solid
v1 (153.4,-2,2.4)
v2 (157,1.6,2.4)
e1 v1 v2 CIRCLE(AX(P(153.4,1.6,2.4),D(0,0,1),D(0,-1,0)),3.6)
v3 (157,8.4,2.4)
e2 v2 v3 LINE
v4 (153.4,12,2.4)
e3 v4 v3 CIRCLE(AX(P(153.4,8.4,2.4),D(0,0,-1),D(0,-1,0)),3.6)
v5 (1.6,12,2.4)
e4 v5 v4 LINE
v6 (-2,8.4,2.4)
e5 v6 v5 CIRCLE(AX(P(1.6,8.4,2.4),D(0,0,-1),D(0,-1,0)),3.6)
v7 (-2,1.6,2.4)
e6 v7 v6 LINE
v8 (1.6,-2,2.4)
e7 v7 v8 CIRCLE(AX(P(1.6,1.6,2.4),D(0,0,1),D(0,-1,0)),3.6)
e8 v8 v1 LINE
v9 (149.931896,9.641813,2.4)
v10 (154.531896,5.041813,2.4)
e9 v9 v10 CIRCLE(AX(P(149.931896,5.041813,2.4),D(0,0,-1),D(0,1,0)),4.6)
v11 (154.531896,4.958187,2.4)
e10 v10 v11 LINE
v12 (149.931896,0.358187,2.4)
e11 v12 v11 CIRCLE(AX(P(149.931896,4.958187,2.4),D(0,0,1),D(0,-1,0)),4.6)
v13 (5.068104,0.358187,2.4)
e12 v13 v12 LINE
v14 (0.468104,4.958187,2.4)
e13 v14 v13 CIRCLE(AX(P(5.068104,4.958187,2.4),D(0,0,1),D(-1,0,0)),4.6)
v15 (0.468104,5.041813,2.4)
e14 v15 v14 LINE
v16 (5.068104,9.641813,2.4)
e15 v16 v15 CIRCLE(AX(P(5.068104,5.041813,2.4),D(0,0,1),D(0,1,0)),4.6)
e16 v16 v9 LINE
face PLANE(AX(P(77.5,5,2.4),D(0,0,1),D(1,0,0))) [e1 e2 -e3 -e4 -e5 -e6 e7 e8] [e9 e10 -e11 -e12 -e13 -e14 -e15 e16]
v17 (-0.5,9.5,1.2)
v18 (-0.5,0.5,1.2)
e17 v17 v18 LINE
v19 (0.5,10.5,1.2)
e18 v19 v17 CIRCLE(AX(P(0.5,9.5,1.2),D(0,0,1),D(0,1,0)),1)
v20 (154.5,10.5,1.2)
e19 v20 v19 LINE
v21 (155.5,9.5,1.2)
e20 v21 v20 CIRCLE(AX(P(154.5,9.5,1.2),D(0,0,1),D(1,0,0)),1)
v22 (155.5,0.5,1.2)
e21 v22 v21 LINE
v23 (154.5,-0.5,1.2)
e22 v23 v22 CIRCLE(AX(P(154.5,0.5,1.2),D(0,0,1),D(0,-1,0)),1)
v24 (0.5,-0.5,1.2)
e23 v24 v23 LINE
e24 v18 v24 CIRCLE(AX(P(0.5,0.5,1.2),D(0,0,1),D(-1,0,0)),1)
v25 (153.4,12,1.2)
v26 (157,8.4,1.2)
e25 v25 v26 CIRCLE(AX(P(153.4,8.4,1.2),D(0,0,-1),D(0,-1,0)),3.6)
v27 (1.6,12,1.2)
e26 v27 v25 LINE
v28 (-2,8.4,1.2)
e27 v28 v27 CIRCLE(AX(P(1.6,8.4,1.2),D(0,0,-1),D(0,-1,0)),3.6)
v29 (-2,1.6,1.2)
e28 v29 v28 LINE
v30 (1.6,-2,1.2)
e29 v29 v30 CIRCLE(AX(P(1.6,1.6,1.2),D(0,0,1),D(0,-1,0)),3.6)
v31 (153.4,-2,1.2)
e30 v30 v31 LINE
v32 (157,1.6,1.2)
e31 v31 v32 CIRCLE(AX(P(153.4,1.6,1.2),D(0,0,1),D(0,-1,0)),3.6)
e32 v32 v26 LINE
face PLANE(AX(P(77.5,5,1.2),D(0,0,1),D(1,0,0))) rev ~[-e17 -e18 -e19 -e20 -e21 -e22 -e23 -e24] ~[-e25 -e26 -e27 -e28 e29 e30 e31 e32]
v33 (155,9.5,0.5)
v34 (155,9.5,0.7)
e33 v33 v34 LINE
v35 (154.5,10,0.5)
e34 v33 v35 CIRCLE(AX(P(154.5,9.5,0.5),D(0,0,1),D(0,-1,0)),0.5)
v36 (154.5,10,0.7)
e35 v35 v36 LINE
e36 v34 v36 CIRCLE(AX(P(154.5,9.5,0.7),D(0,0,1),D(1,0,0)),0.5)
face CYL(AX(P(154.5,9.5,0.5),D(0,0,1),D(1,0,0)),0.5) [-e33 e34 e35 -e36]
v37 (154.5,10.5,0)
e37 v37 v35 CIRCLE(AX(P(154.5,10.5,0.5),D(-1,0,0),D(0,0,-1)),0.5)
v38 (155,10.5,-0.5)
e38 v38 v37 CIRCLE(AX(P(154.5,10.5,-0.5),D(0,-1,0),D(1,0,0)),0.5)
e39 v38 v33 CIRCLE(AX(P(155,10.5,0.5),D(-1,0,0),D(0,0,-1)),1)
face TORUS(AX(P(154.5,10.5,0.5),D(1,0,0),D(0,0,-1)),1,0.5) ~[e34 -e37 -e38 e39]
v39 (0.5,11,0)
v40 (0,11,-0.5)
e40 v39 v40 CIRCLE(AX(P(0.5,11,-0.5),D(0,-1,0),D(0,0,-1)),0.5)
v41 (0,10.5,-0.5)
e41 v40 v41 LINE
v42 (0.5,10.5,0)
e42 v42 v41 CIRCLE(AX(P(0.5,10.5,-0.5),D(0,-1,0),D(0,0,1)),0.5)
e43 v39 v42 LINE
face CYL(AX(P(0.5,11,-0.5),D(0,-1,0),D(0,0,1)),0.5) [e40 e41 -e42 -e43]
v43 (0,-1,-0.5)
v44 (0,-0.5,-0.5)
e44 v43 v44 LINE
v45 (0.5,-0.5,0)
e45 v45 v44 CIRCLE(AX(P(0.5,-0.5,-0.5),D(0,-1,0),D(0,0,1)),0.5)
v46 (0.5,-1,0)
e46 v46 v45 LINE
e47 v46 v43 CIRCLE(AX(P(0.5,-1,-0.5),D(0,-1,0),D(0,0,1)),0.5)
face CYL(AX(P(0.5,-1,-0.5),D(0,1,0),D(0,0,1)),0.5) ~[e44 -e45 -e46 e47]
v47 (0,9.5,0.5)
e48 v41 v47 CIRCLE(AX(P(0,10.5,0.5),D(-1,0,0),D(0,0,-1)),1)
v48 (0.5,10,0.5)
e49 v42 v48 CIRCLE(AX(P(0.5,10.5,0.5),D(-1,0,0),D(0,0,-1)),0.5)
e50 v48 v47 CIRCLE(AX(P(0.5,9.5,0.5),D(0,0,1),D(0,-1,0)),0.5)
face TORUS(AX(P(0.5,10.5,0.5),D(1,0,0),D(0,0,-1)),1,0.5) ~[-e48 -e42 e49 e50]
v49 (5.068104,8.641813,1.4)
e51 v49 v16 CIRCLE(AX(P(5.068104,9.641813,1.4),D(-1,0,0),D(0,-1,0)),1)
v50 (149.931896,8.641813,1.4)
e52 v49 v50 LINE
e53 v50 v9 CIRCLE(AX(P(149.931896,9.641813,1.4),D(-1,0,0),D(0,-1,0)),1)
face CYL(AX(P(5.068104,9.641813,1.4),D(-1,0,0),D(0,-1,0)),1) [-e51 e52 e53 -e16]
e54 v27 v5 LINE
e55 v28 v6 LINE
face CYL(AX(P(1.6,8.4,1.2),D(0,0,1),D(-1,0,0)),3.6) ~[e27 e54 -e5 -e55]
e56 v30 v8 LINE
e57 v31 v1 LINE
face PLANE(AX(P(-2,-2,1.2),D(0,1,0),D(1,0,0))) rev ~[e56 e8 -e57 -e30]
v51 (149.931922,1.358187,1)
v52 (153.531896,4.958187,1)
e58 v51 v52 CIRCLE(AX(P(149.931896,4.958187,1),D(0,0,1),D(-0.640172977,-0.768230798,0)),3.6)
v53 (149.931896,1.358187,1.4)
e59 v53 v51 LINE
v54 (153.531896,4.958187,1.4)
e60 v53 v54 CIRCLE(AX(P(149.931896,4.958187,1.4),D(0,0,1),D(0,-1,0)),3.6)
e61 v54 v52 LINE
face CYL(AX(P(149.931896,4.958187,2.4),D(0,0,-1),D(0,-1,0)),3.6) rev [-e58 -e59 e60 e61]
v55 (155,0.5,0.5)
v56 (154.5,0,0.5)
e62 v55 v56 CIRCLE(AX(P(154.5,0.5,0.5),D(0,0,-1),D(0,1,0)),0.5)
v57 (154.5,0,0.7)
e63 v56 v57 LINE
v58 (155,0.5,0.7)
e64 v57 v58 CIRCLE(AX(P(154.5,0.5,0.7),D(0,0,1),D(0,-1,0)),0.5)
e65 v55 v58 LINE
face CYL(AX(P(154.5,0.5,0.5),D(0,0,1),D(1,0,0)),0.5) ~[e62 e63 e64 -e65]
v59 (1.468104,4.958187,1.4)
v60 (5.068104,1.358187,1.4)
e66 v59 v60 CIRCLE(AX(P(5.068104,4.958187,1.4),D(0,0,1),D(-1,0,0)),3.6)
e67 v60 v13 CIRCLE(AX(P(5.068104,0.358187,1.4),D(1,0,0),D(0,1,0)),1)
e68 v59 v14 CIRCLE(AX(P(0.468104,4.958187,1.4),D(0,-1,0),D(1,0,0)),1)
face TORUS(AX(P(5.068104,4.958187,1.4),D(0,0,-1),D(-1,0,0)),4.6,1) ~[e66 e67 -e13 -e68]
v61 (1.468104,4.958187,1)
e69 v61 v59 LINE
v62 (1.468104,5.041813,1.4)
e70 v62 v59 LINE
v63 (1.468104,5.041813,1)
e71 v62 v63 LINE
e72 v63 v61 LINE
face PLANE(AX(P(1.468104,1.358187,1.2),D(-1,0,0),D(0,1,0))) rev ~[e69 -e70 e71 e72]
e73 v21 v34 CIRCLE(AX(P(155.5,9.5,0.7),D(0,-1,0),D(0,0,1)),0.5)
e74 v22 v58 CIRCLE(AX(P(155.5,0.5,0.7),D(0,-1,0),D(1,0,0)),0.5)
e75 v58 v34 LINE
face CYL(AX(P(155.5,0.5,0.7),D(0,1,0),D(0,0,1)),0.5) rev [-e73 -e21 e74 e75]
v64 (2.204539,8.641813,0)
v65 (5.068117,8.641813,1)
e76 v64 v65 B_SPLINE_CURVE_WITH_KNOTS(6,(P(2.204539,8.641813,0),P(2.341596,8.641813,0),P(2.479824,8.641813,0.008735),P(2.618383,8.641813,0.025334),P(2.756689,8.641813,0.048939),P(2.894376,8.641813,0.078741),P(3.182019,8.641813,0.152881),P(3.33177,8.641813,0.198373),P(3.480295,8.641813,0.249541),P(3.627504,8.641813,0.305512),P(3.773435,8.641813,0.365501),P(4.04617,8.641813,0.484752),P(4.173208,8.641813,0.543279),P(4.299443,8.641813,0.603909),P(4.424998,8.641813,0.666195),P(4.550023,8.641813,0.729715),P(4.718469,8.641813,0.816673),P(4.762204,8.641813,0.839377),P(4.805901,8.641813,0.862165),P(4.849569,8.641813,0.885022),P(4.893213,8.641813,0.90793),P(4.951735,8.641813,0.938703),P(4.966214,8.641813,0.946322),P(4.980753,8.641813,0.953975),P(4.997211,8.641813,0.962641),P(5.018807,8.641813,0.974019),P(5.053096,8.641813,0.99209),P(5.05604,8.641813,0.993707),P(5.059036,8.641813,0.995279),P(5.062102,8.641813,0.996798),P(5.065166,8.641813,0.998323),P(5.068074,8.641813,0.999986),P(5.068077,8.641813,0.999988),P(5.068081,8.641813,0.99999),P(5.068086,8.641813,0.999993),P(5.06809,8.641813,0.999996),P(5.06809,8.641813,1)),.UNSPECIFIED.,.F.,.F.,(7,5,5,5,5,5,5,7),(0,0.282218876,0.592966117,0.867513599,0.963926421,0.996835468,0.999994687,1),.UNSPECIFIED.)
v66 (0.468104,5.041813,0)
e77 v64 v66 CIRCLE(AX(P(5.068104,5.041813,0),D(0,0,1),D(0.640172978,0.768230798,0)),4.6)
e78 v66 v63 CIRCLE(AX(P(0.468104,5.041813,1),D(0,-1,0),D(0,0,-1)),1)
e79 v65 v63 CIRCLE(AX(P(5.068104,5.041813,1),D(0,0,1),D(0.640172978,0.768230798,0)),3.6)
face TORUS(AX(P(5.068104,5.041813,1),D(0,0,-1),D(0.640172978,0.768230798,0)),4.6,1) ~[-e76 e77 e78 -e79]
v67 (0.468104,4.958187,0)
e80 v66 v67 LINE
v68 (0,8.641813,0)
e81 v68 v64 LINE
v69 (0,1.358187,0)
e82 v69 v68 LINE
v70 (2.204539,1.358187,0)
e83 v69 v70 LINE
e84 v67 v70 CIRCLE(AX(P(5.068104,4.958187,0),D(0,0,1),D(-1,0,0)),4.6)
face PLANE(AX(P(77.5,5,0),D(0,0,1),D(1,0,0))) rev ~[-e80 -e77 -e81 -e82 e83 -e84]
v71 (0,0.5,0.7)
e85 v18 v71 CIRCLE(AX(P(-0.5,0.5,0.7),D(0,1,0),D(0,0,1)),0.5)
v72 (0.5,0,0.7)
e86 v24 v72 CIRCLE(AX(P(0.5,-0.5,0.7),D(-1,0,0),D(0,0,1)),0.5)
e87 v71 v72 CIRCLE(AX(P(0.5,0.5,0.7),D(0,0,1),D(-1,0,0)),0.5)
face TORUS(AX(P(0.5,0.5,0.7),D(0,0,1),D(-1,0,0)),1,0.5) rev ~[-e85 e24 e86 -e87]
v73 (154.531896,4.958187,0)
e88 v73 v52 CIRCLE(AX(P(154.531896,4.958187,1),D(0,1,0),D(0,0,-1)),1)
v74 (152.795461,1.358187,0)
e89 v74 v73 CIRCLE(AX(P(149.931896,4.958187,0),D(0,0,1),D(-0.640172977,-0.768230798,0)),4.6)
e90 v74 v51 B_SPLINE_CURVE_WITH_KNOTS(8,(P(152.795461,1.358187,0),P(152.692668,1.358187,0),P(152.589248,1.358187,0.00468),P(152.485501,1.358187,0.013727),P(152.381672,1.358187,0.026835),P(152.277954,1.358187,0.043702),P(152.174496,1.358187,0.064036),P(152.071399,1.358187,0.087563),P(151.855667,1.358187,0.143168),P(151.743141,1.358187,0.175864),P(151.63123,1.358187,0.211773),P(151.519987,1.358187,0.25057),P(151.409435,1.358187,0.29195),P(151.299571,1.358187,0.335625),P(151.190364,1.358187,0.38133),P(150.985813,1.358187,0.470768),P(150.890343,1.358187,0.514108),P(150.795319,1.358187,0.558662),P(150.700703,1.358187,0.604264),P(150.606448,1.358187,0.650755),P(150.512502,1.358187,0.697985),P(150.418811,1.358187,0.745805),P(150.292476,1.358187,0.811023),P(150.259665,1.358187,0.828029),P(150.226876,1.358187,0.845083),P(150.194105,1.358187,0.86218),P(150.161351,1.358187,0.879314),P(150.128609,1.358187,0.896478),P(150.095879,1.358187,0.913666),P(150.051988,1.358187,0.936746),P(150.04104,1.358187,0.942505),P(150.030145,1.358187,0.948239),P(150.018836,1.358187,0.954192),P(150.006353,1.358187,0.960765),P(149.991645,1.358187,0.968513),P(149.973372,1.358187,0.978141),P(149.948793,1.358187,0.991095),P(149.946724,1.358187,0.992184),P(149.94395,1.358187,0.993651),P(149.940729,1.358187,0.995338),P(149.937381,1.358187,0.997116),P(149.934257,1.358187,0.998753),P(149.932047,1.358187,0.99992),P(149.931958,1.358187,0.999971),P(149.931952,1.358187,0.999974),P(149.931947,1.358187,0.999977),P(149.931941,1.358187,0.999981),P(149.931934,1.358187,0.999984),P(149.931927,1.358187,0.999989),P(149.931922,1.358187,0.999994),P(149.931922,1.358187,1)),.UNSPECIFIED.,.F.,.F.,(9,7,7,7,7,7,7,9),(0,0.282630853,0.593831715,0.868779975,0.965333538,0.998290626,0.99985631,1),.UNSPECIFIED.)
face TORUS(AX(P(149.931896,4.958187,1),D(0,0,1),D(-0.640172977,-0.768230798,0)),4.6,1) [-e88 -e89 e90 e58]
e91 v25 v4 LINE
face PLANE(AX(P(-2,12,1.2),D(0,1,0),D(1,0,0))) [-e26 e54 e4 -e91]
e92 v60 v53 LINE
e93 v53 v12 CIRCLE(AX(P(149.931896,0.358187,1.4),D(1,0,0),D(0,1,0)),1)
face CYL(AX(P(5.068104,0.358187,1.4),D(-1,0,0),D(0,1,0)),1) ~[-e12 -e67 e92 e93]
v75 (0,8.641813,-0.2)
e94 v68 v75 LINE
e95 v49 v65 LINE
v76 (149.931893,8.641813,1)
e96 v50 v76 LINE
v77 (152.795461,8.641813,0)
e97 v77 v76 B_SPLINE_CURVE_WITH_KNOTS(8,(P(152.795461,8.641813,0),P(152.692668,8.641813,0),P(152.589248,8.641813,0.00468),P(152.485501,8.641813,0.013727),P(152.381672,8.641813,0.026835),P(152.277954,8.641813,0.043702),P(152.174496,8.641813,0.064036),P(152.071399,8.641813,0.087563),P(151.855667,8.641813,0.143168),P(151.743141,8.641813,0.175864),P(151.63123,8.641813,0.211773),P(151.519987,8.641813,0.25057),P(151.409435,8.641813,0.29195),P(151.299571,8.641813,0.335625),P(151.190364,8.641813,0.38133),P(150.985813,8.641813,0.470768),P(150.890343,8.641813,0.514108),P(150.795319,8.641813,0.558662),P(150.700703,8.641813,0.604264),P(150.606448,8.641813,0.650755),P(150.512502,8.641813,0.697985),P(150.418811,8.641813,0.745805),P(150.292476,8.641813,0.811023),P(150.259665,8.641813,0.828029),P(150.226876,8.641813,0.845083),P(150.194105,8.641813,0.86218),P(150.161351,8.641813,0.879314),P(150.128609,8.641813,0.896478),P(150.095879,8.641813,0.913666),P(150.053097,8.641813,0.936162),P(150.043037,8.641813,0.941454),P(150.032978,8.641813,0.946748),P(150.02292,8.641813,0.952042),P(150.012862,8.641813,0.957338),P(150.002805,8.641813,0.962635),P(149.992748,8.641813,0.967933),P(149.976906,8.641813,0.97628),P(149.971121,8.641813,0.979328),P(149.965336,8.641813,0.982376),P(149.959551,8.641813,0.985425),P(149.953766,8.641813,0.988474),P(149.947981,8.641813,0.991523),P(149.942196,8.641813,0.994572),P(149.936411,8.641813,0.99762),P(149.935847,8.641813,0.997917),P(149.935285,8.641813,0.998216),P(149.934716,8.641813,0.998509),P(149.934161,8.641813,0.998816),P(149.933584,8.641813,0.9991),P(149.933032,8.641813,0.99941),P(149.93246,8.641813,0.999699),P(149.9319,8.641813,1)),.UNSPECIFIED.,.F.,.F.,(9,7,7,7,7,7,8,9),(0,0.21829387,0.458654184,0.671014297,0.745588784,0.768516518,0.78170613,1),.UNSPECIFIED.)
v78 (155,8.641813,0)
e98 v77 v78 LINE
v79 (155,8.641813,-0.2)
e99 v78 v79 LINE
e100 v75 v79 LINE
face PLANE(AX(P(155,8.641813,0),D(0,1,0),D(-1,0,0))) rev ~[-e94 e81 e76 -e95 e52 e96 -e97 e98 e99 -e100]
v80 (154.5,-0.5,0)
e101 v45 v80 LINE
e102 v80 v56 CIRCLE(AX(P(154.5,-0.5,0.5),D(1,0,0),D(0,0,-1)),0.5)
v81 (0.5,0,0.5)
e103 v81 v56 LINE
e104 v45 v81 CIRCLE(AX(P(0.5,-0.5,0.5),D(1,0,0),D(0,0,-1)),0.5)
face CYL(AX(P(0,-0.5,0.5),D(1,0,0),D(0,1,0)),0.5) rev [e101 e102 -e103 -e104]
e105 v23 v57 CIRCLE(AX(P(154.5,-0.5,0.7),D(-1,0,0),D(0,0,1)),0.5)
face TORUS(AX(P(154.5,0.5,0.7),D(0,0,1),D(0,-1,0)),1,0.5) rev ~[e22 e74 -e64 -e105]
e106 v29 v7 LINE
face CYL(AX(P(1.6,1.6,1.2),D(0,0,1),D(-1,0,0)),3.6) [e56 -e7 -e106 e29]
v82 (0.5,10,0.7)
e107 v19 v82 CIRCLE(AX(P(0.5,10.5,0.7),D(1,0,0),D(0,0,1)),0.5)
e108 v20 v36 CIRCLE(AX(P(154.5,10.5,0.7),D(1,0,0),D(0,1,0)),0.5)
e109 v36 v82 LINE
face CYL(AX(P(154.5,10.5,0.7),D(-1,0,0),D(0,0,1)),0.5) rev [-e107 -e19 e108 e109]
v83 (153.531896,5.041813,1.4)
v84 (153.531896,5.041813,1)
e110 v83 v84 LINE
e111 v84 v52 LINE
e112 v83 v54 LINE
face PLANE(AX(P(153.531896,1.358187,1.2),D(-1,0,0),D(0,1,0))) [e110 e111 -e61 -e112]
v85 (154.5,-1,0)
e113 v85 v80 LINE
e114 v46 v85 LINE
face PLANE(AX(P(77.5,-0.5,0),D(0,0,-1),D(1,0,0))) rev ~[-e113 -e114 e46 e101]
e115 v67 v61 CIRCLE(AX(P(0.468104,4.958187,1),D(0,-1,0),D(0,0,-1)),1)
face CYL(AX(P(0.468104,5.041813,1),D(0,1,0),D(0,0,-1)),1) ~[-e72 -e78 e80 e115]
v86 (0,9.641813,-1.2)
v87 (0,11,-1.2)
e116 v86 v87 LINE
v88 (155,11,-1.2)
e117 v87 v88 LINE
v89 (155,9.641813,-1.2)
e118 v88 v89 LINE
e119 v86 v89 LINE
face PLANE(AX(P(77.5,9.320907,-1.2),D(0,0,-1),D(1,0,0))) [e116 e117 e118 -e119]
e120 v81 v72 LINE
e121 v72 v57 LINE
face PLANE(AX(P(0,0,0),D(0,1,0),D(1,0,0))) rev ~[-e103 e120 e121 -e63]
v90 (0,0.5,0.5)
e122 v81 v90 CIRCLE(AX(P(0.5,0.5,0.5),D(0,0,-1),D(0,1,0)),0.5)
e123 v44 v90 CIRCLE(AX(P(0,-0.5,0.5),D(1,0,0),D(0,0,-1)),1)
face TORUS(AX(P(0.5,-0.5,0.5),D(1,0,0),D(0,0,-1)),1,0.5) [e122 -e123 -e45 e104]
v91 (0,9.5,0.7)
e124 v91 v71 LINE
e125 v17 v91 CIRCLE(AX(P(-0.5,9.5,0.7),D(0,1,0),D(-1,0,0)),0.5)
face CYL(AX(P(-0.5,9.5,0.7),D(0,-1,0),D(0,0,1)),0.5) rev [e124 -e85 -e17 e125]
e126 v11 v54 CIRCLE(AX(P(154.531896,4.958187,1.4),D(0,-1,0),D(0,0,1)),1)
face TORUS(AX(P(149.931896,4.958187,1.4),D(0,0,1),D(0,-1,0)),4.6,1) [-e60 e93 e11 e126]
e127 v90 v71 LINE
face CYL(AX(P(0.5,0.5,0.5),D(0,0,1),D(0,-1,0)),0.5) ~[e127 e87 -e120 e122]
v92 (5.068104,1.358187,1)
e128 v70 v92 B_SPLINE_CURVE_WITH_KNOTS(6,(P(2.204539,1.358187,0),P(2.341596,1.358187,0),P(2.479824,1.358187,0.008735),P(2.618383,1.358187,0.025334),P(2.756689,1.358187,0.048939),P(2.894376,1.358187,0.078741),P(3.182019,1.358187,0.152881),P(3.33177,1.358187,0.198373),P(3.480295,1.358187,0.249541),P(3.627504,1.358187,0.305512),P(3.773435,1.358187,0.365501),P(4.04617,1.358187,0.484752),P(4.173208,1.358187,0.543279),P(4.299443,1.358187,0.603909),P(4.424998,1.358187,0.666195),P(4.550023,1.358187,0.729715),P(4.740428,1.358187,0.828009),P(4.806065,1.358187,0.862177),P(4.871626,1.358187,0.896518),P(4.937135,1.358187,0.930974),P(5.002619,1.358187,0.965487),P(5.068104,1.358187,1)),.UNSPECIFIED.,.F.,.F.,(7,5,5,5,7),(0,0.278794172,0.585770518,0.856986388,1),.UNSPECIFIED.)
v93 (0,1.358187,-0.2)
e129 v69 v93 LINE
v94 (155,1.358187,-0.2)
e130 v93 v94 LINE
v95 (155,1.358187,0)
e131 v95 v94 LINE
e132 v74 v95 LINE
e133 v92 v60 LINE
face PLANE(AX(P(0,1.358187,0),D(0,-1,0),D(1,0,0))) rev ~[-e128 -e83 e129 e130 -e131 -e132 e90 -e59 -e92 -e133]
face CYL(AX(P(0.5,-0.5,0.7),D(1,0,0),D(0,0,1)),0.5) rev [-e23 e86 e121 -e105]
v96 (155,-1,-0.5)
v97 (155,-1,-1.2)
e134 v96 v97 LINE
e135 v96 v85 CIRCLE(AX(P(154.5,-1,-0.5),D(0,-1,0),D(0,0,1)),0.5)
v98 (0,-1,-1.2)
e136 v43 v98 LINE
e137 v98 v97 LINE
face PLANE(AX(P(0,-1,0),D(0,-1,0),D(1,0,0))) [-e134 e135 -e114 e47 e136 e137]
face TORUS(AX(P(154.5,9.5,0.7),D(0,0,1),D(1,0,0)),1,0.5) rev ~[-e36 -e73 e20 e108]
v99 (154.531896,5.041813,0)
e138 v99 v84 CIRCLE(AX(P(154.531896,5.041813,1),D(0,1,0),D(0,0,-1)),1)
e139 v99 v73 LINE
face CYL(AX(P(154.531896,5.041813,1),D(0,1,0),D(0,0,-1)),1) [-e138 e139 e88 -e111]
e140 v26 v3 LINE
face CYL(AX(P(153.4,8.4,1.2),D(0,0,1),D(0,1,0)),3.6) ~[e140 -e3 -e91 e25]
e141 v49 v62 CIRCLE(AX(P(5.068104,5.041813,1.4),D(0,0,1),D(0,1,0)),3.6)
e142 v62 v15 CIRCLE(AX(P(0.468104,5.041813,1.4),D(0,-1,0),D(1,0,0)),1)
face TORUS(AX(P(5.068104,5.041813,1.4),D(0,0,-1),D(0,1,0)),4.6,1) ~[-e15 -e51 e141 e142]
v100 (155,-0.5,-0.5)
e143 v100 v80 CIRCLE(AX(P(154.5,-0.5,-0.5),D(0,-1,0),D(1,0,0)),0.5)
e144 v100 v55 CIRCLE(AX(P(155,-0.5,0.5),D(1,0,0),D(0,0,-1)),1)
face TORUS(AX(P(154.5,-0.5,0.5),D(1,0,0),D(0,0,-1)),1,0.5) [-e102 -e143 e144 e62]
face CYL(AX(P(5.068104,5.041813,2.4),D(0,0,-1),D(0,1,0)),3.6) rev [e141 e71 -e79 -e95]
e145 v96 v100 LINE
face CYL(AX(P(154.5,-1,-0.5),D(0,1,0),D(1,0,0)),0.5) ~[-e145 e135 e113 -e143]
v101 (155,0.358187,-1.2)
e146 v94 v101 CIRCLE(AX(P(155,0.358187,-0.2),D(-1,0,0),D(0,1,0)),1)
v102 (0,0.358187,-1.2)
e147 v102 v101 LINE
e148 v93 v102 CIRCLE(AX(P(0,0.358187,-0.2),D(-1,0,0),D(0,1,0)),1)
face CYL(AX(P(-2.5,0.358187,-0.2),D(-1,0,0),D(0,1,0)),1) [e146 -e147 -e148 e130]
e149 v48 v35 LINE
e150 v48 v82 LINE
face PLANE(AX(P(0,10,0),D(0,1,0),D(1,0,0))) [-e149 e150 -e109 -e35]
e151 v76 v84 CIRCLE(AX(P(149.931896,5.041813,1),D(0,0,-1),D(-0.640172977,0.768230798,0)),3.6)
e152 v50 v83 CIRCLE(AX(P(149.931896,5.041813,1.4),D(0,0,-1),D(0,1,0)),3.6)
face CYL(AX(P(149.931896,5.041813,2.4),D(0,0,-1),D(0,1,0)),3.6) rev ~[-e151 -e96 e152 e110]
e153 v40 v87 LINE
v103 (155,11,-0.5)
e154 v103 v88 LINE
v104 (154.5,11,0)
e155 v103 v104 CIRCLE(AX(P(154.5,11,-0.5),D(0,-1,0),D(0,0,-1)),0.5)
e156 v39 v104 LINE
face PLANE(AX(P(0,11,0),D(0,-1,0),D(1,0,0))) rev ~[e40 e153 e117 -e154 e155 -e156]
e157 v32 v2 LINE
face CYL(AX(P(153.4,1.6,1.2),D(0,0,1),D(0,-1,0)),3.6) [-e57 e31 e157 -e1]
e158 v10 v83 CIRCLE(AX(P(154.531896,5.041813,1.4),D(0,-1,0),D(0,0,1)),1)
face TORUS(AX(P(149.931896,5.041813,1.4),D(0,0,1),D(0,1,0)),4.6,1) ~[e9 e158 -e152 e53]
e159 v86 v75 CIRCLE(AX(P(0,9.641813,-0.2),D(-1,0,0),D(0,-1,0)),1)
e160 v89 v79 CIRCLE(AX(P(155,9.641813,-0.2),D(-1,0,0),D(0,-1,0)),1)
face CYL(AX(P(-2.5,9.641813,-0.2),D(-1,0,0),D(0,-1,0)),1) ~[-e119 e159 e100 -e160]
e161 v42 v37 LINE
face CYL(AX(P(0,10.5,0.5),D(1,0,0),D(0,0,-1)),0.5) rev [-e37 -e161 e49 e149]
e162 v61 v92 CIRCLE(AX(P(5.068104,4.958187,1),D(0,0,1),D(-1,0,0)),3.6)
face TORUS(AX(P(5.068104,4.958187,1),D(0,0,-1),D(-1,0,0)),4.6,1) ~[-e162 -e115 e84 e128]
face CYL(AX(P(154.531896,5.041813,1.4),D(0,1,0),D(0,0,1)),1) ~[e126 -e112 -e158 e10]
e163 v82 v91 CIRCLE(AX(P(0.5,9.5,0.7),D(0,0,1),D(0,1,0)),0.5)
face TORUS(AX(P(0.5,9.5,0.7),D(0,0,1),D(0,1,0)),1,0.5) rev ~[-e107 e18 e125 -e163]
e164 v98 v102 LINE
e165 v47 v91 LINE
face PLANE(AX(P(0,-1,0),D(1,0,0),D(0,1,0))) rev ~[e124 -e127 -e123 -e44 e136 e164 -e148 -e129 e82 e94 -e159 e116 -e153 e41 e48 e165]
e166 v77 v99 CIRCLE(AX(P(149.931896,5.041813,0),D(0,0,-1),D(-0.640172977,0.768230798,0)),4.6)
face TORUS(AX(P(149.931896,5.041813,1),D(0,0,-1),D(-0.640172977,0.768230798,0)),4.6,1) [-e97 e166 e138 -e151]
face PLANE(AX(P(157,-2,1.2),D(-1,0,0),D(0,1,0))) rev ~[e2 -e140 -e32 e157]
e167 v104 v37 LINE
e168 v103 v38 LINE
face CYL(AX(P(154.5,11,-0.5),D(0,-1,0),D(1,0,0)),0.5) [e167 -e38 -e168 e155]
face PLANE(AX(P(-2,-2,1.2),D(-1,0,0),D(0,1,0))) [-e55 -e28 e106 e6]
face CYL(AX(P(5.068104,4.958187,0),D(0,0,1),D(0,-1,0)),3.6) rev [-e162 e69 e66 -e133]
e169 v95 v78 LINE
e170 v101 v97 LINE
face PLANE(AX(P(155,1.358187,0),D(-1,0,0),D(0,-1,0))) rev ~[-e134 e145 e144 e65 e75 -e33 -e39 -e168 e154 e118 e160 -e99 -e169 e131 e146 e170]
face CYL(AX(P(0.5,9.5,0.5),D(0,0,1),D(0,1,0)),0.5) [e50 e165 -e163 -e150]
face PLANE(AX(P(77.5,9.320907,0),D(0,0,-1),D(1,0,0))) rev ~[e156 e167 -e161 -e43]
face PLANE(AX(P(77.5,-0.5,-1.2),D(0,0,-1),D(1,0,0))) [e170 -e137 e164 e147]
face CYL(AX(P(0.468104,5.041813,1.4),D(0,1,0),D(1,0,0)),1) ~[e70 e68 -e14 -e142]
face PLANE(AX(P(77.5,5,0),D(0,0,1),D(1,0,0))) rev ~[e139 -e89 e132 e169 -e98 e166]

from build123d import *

# Parameters (mm, degrees)
F0_W         = 155
F0_H         = 10
F0_W_2       = 152.0637926605
F0_H_2       = 7.2836262298
F1_DEPTH     = 1.2
F2_W         = 159
F2_H         = 14
F2_W_2       = 155
F2_H_2       = 10
F2_W_3       = 152.0637926605
F2_H_3       = 7.2836262298
F3_DEPTH     = 1.2
F4_W         = 155
F4_H         = 1
F5_DEPTH     = 1.2
F6_R         = 3.6
F7_T1_DEPTH  = 160
F7_T3_DEPTH  = 0.0836262298
F7_T5_DEPTH  = 144.8637926605
F7_T10_ANGLE = 129.8047192326
F7_T13_ANGLE = 90
F7_T17_ANGLE = 129.8047192326
F7_T22_ANGLE = 129.8047192326
F7_T25_ANGLE = 90
F7_T27_ANGLE = 90
F7_T29_ANGLE = 90
F7_T33_ANGLE = 129.8047192326
F8_F1_R      = 0.5
F8_F2_R      = 0.5
F8_F3_R      = 0.5


# Not quite as in the source:
# - a fillet or chamfer that OpenCascade refuses, or shapes differently, is made with other operations: its cross-section is extruded or revolved along the edge and cut away or added


with BuildPart() as f1:
    # F0 (on Top) → F1 (new body)
    with BuildSketch(Plane.XY):
        with Locations((77.5, 5)):
            Rectangle(F0_W, F0_H)
        with Locations((77.5, 5)):
            Rectangle(F0_W_2, F0_H_2, mode=Mode.SUBTRACT)
    extrude(amount=F1_DEPTH)

    # F2 (on face) → F3 (join)
    with BuildSketch(Plane.XY.offset(1.2)):
        with Locations((77.5, 5)):
            Rectangle(F2_W, F2_H)
        with Locations((77.5, 5)):
            Rectangle(F2_W_2, F2_H_2, mode=Mode.SUBTRACT)
        with Locations((77.5, 5)):
            Rectangle(F2_W_2, F2_H_2)
        with Locations((77.5, 5)):
            Rectangle(F2_W_3, F2_H_3, mode=Mode.SUBTRACT)
    extrude(amount=F3_DEPTH)

    # F4 (on face) → F5 (join)
    with BuildSketch(Plane(origin=(0, 0, 0), x_dir=(1, 0, 0), z_dir=(0, 0, -1))):
        with Locations((77.5, 0.5)):
            Rectangle(F4_W, F4_H)
        Polygon((155, -1.3581868851), (155, 0), (0, 0), (0, -1.3581868851), (1.4681036697, -1.3581868851), (153.5318963303, -1.3581868851), align=None)
        Polygon((155, -10), (155, -8.6418131149), (153.5318963303, -8.6418131149), (1.4681036697, -8.6418131149), (0, -8.6418131149), (0, -10), align=None)
        with Locations((77.5, -10.5)):
            Rectangle(F4_W, F4_H)
    extrude(amount=F5_DEPTH)

    # F6
    f6_edges = [f1.edges().sort_by_distance(p)[0] for p in [
        (1.468104, 1.358187, 1.2),
        (1.468104, 8.641813, 1.2),
        (153.531896, 1.358187, 1.2),
        (153.531896, 8.641813, 1.2),
        (157, -2, 1.8),
        (157, 12, 1.8),
        (-2, 12, 1.8),
        (-2, -2, 1.8),
    ]]
    fillet(f6_edges, radius=F6_R)

    # F7: fillet of radius 1 on 16 edges, made by hand

    # F7_s2 → F7_t1 (cut)
    with BuildSketch(Plane.YZ.offset(-2.5)):
        with BuildLine():
            ThreePointArc((1.3581868851, -0.2), (1.0652936663, -0.9071067812), (0.3581868851, -1.2))
            Line((0.3581868851, -1.2), (1.3581868851, -1.2))
            Line((1.3581868851, -1.2), (1.3581868851, -0.2))
        make_face()
        with BuildLine():
            ThreePointArc((8.6418131149, -0.2), (8.9347063337, -0.9071067812), (9.6418131149, -1.2))
            Line((9.6418131149, -1.2), (8.6418131149, -1.2))
            Line((8.6418131149, -1.2), (8.6418131149, -0.2))
        make_face()
    extrude(amount=F7_T1_DEPTH, mode=Mode.SUBTRACT)

    # F7_s4 → F7_t3 (cut)
    with BuildSketch(Plane.XZ.offset(-5.0418131149)):
        with BuildLine():
            ThreePointArc((0.4681036697, 0), (1.1752104509, 0.2928932188), (1.4681036697, 1))
            Line((1.4681036697, 1), (1.4681036697, 0))
            Line((1.4681036697, 0), (0.4681036697, 0))
        make_face()
        with BuildLine():
            ThreePointArc((1.4681036697, 1.4), (1.1752104509, 2.1071067812), (0.4681036697, 2.4))
            Line((0.4681036697, 2.4), (1.4681036697, 2.4))
            Line((1.4681036697, 2.4), (1.4681036697, 1.4))
        make_face()
        with BuildLine():
            ThreePointArc((154.5318963303, 2.4), (153.8247895491, 2.1071067812), (153.5318963303, 1.4))
            Line((153.5318963303, 1.4), (153.5318963303, 2.4))
            Line((153.5318963303, 2.4), (154.5318963303, 2.4))
        make_face()
        with BuildLine():
            ThreePointArc((154.5318963303, 0), (153.8247895491, 0.2928932188), (153.5318963303, 1))
            Line((153.5318963303, 1), (153.5318963303, 0))
            Line((153.5318963303, 0), (154.5318963303, 0))
        make_face()
    extrude(amount=F7_T3_DEPTH, mode=Mode.SUBTRACT)

    # F7_s6 → F7_t5 (cut)
    with BuildSketch(Plane.YZ.offset(5.0681036697)):
        with BuildLine():
            ThreePointArc((1.3581868851, 1.4), (1.0652936663, 2.1071067812), (0.3581868851, 2.4))
            Line((0.3581868851, 2.4), (1.3581868851, 2.4))
            Line((1.3581868851, 2.4), (1.3581868851, 1.4))
        make_face()
        with BuildLine():
            ThreePointArc((8.6418131149, 1.4), (8.9347063337, 2.1071067812), (9.6418131149, 2.4))
            Line((9.6418131149, 2.4), (8.6418131149, 2.4))
            Line((8.6418131149, 2.4), (8.6418131149, 1.4))
        make_face()
    extrude(amount=F7_T5_DEPTH, mode=Mode.SUBTRACT)


with BuildPart() as f7_tool8:
    # F7_s9 → F7_t10 (revolve)
    with BuildSketch(Plane(origin=(0.5115194158, -0.4262532935, 0), x_dir=(0, 0, 1), z_dir=(0.7682307976, -0.6401729779, 0))):
        with BuildLine():
            ThreePointArc((0, -11.7177391291), (0.2928932188, -11.0106323479), (1, -10.7177391291))
            Line((1, -10.7177391291), (0, -10.7177391291))
            Line((0, -10.7177391291), (0, -11.7177391291))
        make_face()
    revolve(axis=Axis((5.0681036697, 5.0418131149, 0), (0, 0, 1)), revolution_arc=F7_T10_ANGLE)

    split(bisect_by=Plane.XZ.offset(-8.6418131149), keep=Keep.TOP)


with BuildPart() as f1_1:
    add(f1.part)

    # F7_t7: cut F7_tool8
    add(f7_tool8.part, mode=Mode.SUBTRACT)

    # F7_s12 → F7_t13 (revolve, cut)
    with BuildSketch(Plane.YZ.offset(5.0681036697)):
        with BuildLine():
            ThreePointArc((8.6418131149, 1.4), (8.9347063337, 2.1071067812), (9.6418131149, 2.4))
            Line((9.6418131149, 2.4), (8.6418131149, 2.4))
            Line((8.6418131149, 2.4), (8.6418131149, 1.4))
        make_face()
    revolve(axis=Axis((5.0681036697, 5.0418131149, 2.4), (0, 0, 1)), revolution_arc=F7_T13_ANGLE, mode=Mode.SUBTRACT)


with BuildPart() as f7_tool15:
    # F7_s16 → F7_t17 (revolve)
    with BuildSketch(Plane(origin=(90.9661571375, 75.8028393036, 0), x_dir=(0, 0, 1), z_dir=(-0.7682307976, -0.6401729779, 0))):
        with BuildLine():
            ThreePointArc((0, -87.5090724404), (0.2928932188, -88.2161792216), (1, -88.5090724404))
            Line((1, -88.5090724404), (0, -88.5090724404))
            Line((0, -88.5090724404), (0, -87.5090724404))
        make_face()
    revolve(axis=Axis((149.9318963303, 5.0418131149, 0), (0, 0, -1)), revolution_arc=F7_T17_ANGLE)

    split(bisect_by=Plane.XZ.offset(-8.6418131149), keep=Keep.TOP)


with BuildPart() as f1_2:
    add(f1_1.part)

    # F7_t14: cut F7_tool15
    add(f7_tool15.part, mode=Mode.SUBTRACT)


with BuildPart() as f7_tool20:
    # F7_s21 → F7_t22 (revolve)
    with BuildSketch(Plane.XZ.offset(-4.9581868851)):
        with BuildLine():
            ThreePointArc((0.4681036697, 0), (1.1752104509, 0.2928932188), (1.4681036697, 1))
            Line((1.4681036697, 1), (1.4681036697, 0))
            Line((1.4681036697, 0), (0.4681036697, 0))
        make_face()
    revolve(axis=Axis((5.0681036697, 4.9581868851, 0), (0, 0, 1)), revolution_arc=F7_T22_ANGLE)

    split(bisect_by=Plane.XZ.offset(-1.3581868851), keep=Keep.BOTTOM)


with BuildPart() as f1_3:
    add(f1_2.part)

    # F7_t19: cut F7_tool20
    add(f7_tool20.part, mode=Mode.SUBTRACT)

    # F7_s24 → F7_t25 (revolve, cut)
    with BuildSketch(Plane.XZ.offset(-4.9581868851)):
        with BuildLine():
            ThreePointArc((1.4681036697, 1.4), (1.1752104509, 2.1071067812), (0.4681036697, 2.4))
            Line((0.4681036697, 2.4), (1.4681036697, 2.4))
            Line((1.4681036697, 2.4), (1.4681036697, 1.4))
        make_face()
    revolve(axis=Axis((5.0681036697, 4.9581868851, 2.4), (0, 0, 1)), revolution_arc=F7_T25_ANGLE, mode=Mode.SUBTRACT)

    # F7_s26 → F7_t27 (revolve, cut)
    with BuildSketch(Plane.YZ.offset(149.9318963303)):
        with BuildLine():
            ThreePointArc((9.6418131149, 2.4), (8.9347063337, 2.1071067812), (8.6418131149, 1.4))
            Line((8.6418131149, 1.4), (8.6418131149, 2.4))
            Line((8.6418131149, 2.4), (9.6418131149, 2.4))
        make_face()
    revolve(axis=Axis((149.9318963303, 5.0418131149, 2.4), (0, 0, -1)), revolution_arc=F7_T27_ANGLE, mode=Mode.SUBTRACT)

    # F7_s28 → F7_t29 (revolve, cut)
    with BuildSketch(Plane.YZ.offset(149.9318963303)):
        with BuildLine():
            ThreePointArc((0.3581868851, 2.4), (1.0652936663, 2.1071067812), (1.3581868851, 1.4))
            Line((1.3581868851, 1.4), (1.3581868851, 2.4))
            Line((1.3581868851, 2.4), (0.3581868851, 2.4))
        make_face()
    revolve(axis=Axis((149.9318963303, 4.9581868851, 2.4), (0, 0, 1)), revolution_arc=F7_T29_ANGLE, mode=Mode.SUBTRACT)


with BuildPart() as f7_tool31:
    # F7_s32 → F7_t33 (revolve)
    with BuildSketch(Plane(origin=(86.0481511635, -71.7046248877, 0), x_dir=(0, 0, 1), z_dir=(-0.7682307976, 0.6401729779, 0))):
        with BuildLine():
            ThreePointArc((1, 96.1913804165), (0.2928932188, 95.8984871977), (0, 95.1913804165))
            Line((0, 95.1913804165), (0, 96.1913804165))
            Line((0, 96.1913804165), (1, 96.1913804165))
        make_face()
    revolve(axis=Axis((149.9318963303, 4.9581868851, 0), (0, 0, 1)), revolution_arc=F7_T33_ANGLE)

    split(bisect_by=Plane.XZ.offset(-1.3581868851), keep=Keep.BOTTOM)


with BuildPart() as f1_4:
    add(f1_3.part)

    # F7_t30: cut F7_tool31
    add(f7_tool31.part, mode=Mode.SUBTRACT)

    # F8: fillet of radius 0.5 on 10 edges, made by hand

    # F8_f1
    f8_f1_edges = [f1_4.edges().sort_by_distance(p)[0] for p in [
        (77.5, 0, 0),
        (77.5, 10, 0),
    ]]
    fillet(f8_f1_edges, radius=F8_F1_R)

    # F8_f2
    f8_f2_edges = [f1_4.edges().sort_by_distance(p)[0] for p in [
        (0, 0, 0.85),
        (155, 0, 0.85),
        (155, 10, 0.85),
        (0, 10, 0.85),
        (0, 10.1464466094, 0.1464466094),
        (155, 10.1464466094, 0.1464466094),
        (155, -0.1464466094, 0.1464466094),
        (0, -0.1464466094, 0.1464466094),
    ]]
    fillet(f8_f2_edges, radius=F8_F2_R)

    # F8_f3
    f8_f3_edges = [f1_4.edges().sort_by_distance(p)[0] for p in [
        (77.5, 0, 1.2),
        (77.5, 10, 1.2),
        (155, 5, 1.2),
        (0, 5, 1.2),
        (0.1464466094, 9.8535533906, 1.2),
        (0.1464466094, 0.1464466094, 1.2),
        (154.8535533906, 0.1464466094, 1.2),
        (154.8535533906, 9.8535533906, 1.2),
    ]]
    fillet(f8_f3_edges, radius=F8_F3_R)


solid = f1_4.part
